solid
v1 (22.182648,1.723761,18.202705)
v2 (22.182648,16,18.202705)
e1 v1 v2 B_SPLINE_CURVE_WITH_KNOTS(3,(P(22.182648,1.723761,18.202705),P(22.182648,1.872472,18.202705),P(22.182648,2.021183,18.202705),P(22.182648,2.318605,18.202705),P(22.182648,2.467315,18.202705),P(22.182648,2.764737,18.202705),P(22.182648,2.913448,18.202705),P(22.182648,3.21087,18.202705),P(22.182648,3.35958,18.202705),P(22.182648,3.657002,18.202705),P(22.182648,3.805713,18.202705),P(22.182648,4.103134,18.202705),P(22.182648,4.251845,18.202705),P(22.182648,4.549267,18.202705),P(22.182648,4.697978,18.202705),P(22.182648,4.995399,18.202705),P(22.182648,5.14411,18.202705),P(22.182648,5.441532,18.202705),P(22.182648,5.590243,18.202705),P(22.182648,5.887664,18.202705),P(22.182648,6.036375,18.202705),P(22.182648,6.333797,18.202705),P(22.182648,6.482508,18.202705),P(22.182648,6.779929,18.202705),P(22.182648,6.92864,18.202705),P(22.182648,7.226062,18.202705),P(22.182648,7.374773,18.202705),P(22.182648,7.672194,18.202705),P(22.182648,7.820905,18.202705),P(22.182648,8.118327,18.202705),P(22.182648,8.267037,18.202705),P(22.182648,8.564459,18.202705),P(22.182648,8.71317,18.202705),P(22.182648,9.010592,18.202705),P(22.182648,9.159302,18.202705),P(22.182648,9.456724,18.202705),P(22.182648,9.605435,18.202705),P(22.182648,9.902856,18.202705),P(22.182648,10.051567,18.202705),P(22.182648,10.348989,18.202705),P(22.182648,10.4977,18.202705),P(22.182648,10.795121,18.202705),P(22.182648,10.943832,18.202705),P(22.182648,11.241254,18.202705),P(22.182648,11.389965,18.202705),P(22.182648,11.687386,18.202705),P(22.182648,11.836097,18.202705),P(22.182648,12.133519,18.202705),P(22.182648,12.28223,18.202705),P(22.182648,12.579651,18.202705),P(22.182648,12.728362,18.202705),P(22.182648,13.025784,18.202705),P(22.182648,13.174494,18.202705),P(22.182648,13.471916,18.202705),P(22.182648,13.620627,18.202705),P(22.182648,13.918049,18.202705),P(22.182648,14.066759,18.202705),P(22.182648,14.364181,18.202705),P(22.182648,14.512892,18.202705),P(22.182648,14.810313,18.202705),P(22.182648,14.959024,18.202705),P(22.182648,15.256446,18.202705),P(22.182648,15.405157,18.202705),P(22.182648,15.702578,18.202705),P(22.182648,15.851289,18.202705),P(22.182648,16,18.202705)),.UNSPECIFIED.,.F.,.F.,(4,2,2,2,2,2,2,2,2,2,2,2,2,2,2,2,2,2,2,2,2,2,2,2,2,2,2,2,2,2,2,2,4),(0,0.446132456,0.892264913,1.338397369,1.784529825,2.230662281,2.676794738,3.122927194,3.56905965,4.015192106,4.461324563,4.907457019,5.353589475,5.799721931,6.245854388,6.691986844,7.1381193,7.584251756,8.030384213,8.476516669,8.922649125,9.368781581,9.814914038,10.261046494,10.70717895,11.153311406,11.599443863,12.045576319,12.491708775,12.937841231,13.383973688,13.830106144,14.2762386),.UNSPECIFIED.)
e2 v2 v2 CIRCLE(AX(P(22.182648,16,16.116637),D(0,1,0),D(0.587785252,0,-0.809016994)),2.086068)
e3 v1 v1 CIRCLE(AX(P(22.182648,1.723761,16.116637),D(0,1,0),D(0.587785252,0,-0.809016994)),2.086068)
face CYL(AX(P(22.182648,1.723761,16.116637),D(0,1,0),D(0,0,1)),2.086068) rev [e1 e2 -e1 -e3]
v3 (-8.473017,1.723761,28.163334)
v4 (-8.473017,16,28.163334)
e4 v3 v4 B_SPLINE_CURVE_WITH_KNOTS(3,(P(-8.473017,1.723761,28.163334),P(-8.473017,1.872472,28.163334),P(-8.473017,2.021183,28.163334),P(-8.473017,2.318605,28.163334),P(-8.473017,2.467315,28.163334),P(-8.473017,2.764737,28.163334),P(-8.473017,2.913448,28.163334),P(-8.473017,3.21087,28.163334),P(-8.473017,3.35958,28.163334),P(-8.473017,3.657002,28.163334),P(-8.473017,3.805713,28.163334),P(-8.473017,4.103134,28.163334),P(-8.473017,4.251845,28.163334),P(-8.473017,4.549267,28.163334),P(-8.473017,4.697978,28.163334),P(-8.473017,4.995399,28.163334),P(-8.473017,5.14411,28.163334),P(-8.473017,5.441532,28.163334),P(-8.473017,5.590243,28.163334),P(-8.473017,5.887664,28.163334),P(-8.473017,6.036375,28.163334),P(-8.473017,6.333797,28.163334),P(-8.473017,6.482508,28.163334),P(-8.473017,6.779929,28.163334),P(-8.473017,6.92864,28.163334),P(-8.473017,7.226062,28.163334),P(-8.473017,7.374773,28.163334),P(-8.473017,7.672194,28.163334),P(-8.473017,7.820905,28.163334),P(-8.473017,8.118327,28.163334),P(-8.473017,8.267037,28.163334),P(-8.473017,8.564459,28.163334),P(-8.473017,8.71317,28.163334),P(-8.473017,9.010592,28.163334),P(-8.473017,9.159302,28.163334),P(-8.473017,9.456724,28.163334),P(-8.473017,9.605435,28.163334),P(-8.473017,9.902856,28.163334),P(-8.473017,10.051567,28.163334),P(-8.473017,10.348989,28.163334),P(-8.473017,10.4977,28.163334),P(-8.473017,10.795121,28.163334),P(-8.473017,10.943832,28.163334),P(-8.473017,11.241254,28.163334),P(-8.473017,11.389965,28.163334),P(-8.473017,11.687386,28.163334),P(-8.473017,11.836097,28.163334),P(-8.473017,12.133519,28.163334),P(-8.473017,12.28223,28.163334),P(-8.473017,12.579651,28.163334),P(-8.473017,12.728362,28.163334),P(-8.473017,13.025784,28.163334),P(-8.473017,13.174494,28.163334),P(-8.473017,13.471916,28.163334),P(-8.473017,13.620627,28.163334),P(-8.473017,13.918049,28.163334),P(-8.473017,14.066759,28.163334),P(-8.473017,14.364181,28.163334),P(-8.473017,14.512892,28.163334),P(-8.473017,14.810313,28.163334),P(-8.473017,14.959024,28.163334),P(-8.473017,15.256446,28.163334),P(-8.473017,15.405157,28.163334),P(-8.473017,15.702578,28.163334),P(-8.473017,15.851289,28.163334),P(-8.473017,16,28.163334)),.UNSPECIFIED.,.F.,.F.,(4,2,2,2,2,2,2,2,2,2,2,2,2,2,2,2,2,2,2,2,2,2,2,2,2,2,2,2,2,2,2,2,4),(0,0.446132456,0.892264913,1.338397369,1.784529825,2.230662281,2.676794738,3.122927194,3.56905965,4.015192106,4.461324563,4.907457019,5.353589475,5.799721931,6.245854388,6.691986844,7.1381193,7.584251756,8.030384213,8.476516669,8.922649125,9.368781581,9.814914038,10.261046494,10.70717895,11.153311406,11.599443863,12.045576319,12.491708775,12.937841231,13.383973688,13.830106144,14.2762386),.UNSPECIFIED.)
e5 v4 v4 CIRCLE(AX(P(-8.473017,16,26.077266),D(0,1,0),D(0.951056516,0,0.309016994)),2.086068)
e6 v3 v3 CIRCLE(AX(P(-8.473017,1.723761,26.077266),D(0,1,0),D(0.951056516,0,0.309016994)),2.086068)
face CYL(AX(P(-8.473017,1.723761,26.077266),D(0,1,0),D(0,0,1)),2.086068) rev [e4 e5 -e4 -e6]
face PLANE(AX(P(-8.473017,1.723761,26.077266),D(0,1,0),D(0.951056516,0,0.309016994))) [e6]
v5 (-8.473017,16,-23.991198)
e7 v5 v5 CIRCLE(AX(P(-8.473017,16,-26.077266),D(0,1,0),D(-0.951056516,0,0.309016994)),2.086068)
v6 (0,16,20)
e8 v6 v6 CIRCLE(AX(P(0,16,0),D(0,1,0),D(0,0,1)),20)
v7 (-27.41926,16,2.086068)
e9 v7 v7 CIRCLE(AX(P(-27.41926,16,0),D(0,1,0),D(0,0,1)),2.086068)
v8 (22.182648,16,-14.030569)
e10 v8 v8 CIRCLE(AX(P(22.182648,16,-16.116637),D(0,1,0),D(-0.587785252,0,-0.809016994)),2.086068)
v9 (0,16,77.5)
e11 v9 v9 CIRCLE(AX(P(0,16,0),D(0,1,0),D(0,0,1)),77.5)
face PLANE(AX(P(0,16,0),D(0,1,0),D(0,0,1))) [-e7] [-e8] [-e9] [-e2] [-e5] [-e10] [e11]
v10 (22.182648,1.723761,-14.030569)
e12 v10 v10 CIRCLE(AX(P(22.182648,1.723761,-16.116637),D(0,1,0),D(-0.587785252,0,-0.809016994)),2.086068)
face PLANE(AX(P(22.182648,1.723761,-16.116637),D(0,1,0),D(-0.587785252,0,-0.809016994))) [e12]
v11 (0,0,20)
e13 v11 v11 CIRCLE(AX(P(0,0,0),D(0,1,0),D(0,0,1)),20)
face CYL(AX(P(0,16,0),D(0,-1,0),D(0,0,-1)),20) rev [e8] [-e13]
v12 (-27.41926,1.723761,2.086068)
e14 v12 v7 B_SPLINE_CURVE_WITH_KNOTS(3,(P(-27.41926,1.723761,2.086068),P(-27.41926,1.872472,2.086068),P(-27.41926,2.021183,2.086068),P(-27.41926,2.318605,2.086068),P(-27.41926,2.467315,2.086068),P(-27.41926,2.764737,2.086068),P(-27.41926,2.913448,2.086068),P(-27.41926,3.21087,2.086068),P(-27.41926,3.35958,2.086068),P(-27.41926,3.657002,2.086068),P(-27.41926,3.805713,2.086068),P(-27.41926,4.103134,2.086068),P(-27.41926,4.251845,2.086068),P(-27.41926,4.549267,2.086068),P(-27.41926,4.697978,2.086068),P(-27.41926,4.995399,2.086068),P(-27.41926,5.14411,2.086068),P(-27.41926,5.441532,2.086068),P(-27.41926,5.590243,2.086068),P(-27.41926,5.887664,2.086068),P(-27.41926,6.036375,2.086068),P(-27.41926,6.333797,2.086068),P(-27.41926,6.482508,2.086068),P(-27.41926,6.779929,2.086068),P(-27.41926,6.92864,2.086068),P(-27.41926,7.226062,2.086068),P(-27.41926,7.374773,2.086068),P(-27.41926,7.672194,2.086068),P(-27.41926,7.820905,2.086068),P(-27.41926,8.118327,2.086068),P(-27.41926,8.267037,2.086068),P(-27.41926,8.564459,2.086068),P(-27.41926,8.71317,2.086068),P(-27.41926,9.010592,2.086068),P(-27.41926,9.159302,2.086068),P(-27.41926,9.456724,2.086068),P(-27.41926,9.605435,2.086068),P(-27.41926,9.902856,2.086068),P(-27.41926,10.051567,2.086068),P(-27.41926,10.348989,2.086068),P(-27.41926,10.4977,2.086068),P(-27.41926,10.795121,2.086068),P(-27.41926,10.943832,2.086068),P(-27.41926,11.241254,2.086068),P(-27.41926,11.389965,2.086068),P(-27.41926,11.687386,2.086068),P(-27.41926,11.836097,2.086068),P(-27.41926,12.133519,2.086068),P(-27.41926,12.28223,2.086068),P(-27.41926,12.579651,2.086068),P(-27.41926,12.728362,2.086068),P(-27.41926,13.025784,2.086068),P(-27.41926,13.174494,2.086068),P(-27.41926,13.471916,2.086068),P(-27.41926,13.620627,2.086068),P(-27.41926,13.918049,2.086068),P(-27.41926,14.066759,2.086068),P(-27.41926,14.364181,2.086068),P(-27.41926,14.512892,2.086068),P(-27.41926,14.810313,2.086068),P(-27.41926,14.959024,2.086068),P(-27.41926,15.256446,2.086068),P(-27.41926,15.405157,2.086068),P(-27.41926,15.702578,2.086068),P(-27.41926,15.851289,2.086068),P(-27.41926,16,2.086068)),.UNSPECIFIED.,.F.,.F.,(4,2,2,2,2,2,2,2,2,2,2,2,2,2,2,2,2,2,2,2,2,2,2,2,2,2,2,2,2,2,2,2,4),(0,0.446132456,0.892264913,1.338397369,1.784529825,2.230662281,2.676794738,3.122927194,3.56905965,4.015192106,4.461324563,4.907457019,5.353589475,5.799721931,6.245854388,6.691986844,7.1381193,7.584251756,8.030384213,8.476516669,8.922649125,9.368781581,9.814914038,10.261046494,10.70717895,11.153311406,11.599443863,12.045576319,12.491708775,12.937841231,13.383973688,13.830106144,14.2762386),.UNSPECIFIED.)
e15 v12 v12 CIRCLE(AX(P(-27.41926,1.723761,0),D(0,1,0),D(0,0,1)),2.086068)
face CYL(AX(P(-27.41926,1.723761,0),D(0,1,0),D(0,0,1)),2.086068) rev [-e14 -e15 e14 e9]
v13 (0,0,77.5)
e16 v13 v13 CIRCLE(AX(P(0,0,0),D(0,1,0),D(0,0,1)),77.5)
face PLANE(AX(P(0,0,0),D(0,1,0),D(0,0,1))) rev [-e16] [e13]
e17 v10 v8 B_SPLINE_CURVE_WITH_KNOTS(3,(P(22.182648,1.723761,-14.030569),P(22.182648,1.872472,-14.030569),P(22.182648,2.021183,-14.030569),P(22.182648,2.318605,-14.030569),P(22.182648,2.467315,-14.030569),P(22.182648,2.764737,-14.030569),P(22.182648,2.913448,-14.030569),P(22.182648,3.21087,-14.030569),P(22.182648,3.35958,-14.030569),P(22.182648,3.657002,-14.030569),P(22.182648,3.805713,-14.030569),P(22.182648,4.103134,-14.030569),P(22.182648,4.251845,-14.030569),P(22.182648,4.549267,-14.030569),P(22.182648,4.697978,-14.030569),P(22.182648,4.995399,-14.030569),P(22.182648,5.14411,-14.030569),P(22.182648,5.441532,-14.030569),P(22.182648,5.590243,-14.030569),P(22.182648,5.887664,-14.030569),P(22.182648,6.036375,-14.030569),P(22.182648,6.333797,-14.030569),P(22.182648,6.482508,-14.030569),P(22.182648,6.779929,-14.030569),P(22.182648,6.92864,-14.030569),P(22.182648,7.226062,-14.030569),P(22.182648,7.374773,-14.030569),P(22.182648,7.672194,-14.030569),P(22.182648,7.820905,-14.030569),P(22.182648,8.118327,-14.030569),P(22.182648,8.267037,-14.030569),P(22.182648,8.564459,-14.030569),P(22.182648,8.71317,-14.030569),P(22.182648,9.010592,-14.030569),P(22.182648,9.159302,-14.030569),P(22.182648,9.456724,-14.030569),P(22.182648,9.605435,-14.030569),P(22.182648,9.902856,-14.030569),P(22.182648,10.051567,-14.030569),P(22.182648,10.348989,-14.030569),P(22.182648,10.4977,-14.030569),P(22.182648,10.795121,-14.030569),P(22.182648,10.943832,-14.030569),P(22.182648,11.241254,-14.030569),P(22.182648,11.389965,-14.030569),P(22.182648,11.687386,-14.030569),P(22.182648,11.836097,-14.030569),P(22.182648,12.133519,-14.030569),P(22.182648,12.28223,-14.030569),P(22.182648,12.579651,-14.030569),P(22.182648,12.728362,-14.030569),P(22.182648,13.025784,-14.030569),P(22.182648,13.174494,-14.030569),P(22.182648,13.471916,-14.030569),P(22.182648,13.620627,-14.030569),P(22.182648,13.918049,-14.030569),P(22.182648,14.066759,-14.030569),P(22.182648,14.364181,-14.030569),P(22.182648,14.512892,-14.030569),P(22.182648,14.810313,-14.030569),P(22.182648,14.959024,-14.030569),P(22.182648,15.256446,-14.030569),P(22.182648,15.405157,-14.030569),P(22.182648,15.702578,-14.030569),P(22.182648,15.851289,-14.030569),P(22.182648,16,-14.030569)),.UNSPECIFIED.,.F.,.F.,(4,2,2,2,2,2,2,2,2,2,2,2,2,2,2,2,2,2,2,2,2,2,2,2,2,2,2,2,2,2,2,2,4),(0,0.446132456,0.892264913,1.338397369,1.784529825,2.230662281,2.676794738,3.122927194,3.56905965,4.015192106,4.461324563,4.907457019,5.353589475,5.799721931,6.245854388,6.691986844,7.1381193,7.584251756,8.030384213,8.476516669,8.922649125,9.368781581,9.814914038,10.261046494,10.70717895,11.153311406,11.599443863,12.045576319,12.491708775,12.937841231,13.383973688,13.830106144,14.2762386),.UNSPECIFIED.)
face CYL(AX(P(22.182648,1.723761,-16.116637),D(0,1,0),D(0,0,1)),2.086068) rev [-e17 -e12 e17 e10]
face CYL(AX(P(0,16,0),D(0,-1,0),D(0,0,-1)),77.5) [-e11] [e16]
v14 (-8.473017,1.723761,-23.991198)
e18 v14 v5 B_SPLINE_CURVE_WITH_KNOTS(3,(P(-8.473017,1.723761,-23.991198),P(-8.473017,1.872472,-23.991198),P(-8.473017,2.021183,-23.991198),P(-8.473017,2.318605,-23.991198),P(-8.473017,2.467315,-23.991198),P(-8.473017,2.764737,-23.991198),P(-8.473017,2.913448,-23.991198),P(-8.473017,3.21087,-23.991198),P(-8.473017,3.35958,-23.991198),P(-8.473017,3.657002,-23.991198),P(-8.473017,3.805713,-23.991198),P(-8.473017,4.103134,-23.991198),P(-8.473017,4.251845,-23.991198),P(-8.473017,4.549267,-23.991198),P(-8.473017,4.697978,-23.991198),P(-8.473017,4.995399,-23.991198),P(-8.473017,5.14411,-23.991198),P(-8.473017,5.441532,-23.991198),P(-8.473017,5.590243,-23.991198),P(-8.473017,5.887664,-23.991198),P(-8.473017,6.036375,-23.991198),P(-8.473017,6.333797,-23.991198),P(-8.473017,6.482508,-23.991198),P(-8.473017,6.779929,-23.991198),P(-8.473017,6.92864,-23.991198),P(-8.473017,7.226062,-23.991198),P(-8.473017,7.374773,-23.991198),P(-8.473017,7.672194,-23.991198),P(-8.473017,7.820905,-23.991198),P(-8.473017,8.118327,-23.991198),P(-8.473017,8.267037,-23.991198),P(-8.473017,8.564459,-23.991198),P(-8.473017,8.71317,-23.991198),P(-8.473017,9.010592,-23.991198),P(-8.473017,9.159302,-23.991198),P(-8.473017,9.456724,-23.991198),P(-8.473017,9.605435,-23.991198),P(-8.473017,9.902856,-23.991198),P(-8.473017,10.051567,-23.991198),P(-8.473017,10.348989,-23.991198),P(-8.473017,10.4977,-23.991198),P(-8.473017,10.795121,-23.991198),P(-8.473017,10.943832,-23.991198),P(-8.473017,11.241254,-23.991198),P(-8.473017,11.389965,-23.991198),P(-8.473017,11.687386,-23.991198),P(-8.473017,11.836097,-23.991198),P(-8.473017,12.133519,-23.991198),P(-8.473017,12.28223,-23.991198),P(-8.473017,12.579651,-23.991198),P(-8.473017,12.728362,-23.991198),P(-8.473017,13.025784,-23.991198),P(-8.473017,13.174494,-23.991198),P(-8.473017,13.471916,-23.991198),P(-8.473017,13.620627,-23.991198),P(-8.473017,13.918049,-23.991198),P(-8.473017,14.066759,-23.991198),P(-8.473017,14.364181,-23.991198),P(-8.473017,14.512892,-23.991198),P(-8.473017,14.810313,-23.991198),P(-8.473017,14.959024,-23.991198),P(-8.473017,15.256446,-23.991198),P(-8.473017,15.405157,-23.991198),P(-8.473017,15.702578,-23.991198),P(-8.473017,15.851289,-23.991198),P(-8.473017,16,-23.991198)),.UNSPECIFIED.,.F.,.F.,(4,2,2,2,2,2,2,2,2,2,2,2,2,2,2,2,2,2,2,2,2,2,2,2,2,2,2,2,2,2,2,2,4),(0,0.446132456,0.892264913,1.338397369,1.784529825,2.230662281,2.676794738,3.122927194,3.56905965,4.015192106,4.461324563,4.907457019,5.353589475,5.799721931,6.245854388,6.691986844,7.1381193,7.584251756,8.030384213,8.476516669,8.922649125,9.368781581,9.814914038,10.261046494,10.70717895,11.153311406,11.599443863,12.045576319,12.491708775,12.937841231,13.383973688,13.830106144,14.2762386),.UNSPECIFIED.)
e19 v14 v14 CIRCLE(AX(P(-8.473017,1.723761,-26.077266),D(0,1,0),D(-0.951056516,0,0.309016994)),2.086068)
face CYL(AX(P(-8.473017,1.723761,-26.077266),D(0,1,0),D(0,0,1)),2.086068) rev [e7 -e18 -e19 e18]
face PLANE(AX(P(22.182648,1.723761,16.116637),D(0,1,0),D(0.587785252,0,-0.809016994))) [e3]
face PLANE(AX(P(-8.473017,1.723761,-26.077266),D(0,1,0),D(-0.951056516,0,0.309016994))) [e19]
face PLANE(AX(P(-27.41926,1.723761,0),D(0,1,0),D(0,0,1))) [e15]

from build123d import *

# Parameters (mm, degrees)
SKETCH1_R           = 77.5
BOSS_EXTRUDE1_DEPTH = 16
SKETCH2_R           = 20
CUT_EXTRUDE1_DEPTH  = 111.763261057
SKETCH3_R           = 2.086068246
CUT_EXTRUDE2_DEPTH  = 14.2762386
CIRPATTERN1_COUNT   = 5


with BuildPart() as part:
    # Sketch1 → Boss-Extrude1 (new body)
    with BuildSketch(Plane(origin=(0, 0, 0), x_dir=(1, 0, 0), z_dir=(0, 1, 0))):
        Circle(SKETCH1_R)
    extrude(amount=BOSS_EXTRUDE1_DEPTH)

    # Sketch2 → Cut-Extrude1 (cut, through all)
    with BuildSketch(Plane(origin=(0, 0, 0), x_dir=(1, 0, 0), z_dir=(0, 1, 0))):
        Circle(SKETCH2_R)
    extrude(amount=CUT_EXTRUDE1_DEPTH, mode=Mode.SUBTRACT)

    # Sketch3 → Cut-Extrude2 (cut)
    with BuildSketch(Plane(origin=(0, 16, 0), x_dir=(1, 0, 0), z_dir=(0, 1, 0))):
        with Locations((-27.419260257, 0)):
            Circle(SKETCH3_R)
    cut_extrude2 = extrude(amount=-CUT_EXTRUDE2_DEPTH, mode=Mode.SUBTRACT)

    # CirPattern1: Cut-Extrude2 ×5 about axis
    cirpattern1_axis = Axis((0, 0, 0), (0, 1, 0))
    for i in range(1, CIRPATTERN1_COUNT):
        add(cut_extrude2.rotate(cirpattern1_axis, i * 360 / CIRPATTERN1_COUNT), mode=Mode.SUBTRACT)


solid = part.part
